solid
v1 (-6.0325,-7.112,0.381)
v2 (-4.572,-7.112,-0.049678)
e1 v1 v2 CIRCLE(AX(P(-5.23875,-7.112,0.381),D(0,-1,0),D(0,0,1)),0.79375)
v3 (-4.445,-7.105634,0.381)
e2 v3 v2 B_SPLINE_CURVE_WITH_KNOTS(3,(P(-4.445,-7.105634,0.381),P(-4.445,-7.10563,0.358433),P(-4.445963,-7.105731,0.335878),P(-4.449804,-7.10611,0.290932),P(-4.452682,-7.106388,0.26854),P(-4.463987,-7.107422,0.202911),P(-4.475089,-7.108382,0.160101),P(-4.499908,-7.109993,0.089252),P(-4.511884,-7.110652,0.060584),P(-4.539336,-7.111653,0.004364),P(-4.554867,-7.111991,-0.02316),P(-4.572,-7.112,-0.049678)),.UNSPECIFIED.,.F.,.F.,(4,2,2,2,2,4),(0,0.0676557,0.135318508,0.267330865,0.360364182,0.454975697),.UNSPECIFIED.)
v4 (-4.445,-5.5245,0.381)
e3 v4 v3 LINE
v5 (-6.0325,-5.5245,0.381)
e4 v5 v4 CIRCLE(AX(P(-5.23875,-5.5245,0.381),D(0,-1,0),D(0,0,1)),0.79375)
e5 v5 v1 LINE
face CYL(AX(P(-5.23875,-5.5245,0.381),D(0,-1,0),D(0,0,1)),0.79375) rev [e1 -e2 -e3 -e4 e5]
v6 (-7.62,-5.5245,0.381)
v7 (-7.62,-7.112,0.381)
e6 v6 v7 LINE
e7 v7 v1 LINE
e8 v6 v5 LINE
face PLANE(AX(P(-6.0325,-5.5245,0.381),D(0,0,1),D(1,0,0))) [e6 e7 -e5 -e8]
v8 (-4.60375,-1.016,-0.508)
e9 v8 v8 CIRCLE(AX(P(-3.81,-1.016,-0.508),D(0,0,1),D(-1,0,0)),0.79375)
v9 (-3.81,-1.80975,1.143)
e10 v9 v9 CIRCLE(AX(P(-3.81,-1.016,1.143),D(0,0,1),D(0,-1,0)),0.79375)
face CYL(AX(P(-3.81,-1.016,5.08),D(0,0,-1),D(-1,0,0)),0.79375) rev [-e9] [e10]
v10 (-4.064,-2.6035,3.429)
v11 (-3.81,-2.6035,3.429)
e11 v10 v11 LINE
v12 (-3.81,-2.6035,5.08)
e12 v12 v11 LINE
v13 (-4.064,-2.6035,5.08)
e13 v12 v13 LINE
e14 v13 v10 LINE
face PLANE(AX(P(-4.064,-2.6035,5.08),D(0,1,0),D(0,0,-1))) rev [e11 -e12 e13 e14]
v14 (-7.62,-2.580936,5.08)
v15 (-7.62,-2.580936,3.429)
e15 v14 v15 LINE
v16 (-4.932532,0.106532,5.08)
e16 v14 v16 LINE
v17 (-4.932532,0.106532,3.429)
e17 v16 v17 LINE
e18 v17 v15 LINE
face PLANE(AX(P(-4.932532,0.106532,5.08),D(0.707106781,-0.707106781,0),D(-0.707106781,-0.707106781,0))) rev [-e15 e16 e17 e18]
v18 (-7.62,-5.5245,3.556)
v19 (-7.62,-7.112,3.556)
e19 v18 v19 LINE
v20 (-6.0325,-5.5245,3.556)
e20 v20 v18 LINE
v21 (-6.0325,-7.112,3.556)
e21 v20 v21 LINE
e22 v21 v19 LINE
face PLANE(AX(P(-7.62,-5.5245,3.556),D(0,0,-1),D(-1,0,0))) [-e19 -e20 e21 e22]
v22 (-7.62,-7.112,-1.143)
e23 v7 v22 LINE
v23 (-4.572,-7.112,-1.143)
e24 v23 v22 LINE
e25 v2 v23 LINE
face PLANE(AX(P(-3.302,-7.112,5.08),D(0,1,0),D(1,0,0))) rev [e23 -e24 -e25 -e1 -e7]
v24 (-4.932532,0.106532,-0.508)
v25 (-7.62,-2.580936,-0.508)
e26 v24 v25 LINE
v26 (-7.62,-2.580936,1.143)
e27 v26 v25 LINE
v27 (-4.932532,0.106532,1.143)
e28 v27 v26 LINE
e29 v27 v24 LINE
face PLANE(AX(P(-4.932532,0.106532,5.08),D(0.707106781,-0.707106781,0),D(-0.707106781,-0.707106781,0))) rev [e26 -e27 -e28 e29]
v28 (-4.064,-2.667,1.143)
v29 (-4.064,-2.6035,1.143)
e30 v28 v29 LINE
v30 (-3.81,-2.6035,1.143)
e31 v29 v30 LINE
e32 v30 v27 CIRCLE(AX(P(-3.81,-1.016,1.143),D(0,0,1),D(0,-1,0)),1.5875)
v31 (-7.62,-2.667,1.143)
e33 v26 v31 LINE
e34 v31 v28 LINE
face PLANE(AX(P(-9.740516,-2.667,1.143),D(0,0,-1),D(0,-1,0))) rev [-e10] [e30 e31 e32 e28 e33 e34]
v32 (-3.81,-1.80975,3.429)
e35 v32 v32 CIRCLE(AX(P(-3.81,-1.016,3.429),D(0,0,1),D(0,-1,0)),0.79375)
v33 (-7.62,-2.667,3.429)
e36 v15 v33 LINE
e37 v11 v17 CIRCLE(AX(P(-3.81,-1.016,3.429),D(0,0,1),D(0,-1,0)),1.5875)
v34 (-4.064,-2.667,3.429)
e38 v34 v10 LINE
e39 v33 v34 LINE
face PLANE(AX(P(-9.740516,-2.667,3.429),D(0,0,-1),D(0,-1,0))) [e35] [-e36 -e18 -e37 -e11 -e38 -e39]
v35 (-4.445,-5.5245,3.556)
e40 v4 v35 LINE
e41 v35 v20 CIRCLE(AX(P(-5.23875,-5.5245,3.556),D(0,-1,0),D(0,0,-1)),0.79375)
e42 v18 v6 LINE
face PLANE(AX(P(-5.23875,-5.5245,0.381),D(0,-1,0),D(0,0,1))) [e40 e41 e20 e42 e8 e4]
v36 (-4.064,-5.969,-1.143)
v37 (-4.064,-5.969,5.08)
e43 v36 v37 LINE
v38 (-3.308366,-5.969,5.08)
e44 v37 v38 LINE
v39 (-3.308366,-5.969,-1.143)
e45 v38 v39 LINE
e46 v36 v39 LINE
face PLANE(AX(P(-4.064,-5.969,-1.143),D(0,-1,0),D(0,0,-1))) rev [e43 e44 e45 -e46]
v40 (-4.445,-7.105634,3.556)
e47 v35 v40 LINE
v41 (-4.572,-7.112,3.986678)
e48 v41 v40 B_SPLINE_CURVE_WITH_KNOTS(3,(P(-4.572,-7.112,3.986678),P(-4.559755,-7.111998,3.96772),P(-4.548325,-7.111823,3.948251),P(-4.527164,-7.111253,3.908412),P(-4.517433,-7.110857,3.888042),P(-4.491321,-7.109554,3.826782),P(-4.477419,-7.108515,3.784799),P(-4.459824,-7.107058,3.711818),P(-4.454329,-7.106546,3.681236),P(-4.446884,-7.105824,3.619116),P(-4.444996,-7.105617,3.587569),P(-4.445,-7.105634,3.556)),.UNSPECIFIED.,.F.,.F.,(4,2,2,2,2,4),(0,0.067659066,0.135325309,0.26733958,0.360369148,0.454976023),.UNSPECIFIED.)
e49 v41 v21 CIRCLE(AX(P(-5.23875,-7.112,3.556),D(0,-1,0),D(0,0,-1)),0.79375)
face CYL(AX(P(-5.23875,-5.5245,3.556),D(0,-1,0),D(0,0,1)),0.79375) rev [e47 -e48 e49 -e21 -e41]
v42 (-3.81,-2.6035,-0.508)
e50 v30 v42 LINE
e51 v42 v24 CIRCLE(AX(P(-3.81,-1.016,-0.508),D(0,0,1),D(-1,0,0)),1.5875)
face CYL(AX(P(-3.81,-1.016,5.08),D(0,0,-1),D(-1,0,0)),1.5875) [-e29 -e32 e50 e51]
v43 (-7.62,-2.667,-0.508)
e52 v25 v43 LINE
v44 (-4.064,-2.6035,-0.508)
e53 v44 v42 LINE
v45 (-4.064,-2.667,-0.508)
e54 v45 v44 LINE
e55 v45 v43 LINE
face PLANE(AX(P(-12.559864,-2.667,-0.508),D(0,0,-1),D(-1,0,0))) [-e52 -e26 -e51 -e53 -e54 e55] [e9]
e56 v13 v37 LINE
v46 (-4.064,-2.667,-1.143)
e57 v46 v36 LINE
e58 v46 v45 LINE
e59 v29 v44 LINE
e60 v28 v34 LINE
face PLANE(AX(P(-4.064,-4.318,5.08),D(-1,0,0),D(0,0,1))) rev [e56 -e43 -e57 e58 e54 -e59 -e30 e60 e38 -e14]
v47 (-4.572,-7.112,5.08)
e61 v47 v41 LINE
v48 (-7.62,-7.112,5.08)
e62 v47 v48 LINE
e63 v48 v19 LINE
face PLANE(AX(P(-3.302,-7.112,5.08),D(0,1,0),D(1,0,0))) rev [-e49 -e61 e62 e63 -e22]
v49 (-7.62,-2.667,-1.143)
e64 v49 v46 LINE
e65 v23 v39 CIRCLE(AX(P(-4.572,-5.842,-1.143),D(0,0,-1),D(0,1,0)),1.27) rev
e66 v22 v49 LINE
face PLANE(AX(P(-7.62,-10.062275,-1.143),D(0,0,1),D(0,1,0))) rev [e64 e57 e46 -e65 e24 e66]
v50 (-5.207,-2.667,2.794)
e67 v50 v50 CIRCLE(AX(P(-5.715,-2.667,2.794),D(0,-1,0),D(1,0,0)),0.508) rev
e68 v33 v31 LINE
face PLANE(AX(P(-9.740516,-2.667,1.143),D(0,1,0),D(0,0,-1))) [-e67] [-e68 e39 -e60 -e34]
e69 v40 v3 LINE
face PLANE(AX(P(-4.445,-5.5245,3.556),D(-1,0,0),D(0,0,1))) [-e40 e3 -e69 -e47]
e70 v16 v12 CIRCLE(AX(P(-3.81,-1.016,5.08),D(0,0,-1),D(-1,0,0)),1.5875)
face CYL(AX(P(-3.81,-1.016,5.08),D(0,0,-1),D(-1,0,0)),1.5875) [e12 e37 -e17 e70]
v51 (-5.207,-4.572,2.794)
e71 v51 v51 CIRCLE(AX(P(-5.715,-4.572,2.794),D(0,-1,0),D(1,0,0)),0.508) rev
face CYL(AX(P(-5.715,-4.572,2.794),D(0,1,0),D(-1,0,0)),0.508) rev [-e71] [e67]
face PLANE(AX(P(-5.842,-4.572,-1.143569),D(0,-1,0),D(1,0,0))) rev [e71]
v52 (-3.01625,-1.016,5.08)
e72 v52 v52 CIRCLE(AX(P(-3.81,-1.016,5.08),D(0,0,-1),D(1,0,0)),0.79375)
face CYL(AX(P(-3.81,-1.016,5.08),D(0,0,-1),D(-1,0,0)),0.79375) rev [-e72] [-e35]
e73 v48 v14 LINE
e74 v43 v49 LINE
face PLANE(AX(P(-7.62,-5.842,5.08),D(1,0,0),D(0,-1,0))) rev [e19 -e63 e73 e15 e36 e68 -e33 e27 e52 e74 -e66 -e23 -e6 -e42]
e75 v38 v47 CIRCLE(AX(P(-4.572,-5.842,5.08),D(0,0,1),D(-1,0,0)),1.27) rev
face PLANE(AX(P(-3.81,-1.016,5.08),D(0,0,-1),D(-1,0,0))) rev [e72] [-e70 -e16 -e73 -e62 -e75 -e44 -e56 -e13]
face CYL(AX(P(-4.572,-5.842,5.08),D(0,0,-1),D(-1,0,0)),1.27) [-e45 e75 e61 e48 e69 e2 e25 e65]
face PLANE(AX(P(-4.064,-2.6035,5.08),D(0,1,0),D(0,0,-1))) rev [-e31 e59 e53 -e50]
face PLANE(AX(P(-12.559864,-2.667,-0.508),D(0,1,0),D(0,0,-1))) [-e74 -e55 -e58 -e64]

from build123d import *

# Parameters (mm, degrees)
OUTER_START                           = -1.143
OUTER_CLAMP_LATCH_FILLET1_DEPTH       = 6.223
OUTER_START_2                         = 3.556
OUTER_CLAMP_LATCH_FILLET1_2_OUTLINE_R = 0.79375
OUTER_CLAMP_LATCH_FILLET1_2_DEPTH     = 1.524
OUTER_START_3                         = -0.508
OUTER_CLAMP_LATCH_FILLET1_3_OUTLINE_R = 0.79375
OUTER_CLAMP_LATCH_FILLET1_3_DEPTH     = 1.651
OUTER_CLAMP_LATCH_FILLET1_4_DEPTH     = 1.524
OUTER_START_4                         = 3.429
OUTER_CLAMP_LATCH_FILLET1_5_OUTLINE_R = 0.79375
OUTER_CLAMP_LATCH_FILLET1_5_DEPTH     = 0.127
OUTER_START_5                         = -7.112
OUTER_CLAMP_LATCH_FILLET1_6_DEPTH     = 1.5875
OUTER_START_6                         = -5.207
OUTER_CLAMP_LATCH_FILLET1_7_OUTLINE_R = 0.508
OUTER_CLAMP_LATCH_FILLET1_7_DEPTH     = 2.54
SKETCH1_W                             = 0.762
SKETCH1_H                             = 1.651
CUT_EXTRUDE1_DEPTH                    = 13.139632435
EXTRUDE1_START                        = -2.8575
SKETCH2_R                             = 0.508
EXTRUDE1_DEPTH                        = 2.8575
SKETCH2_3_R                           = 0.508
CUT_EXTRUDE2_DEPTH                    = 1.905


with BuildPart() as part:
    # <Outer Clamp Latch>-<Fillet1>: read off the stored shape, not the designer's step
    # <Outer Clamp Latch>-<Fillet1> outline → <Outer Clamp Latch>-<Fillet1> (new body)
    with BuildSketch(Plane.XY.offset(OUTER_START)):
        with BuildLine():
            Line((-4.445, -5.5245), (-4.445, -7.105634045))
            ThreePointArc((-4.445, -7.105634045), (-3.630142792, -6.693941899), (-3.302, -5.842))
            Line((-3.302, -5.842), (-3.302, -4.318))
            Line((-3.302, -4.318), (-4.064, -4.318))
            Line((-4.064, -4.318), (-4.064, -2.667))
            Line((-4.064, -2.667), (-7.62, -2.667))
            Line((-7.62, -2.667), (-7.62, -5.5245))
            Line((-7.62, -5.5245), (-4.445, -5.5245))
        make_face()
    extrude(amount=OUTER_CLAMP_LATCH_FILLET1_DEPTH)

    # Outer Clamp Latch_-_Fillet1 2 outline → Outer Clamp Latch_-_Fillet1 2 (add)
    # profile 1 of 2: a face of its own
    with BuildSketch(Plane.XY.offset(OUTER_START_2)):
        with BuildLine():
            Line((-7.62, -7.112), (-4.572, -7.112))
            ThreePointArc((-4.572, -7.112), (-4.508420276, -7.110407513), (-4.445, -7.105634045))
            Line((-4.445, -7.105634045), (-4.445, -5.5245))
            Line((-4.445, -5.5245), (-7.62, -5.5245))
            Line((-7.62, -5.5245), (-7.62, -7.112))
        make_face()
    # profile 2 of 2: a face of its own
    with BuildSketch(Plane.XY.offset(OUTER_START_2)):
        with BuildLine():
            Line((-7.62, -2.58093597), (-7.62, -2.667))
            Line((-7.62, -2.667), (-4.064, -2.667))
            Line((-4.064, -2.667), (-4.064, -2.6035))
            Line((-4.064, -2.6035), (-3.81, -2.6035))
            ThreePointArc((-3.81, -2.6035), (-2.343341242, -0.408490051), (-4.932532015, 0.106532015))
            Line((-4.932532015, 0.106532015), (-7.62, -2.58093597))
        make_face()
        with Locations((-3.81, -1.016)):
            Circle(OUTER_CLAMP_LATCH_FILLET1_2_OUTLINE_R, mode=Mode.SUBTRACT)
    extrude(amount=OUTER_CLAMP_LATCH_FILLET1_2_DEPTH)

    # Outer Clamp Latch_-_Fillet1 3 outline → Outer Clamp Latch_-_Fillet1 3 (add)
    with BuildSketch(Plane.XY.offset(OUTER_START_3)):
        with BuildLine():
            Line((-7.62, -2.58093597), (-7.62, -2.667))
            Line((-7.62, -2.667), (-4.064, -2.667))
            Line((-4.064, -2.667), (-4.064, -2.6035))
            Line((-4.064, -2.6035), (-3.81, -2.6035))
            ThreePointArc((-3.81, -2.6035), (-2.343341242, -0.408490051), (-4.932532015, 0.106532015))
            Line((-4.932532015, 0.106532015), (-7.62, -2.58093597))
        make_face()
        with Locations((-3.81, -1.016)):
            Circle(OUTER_CLAMP_LATCH_FILLET1_3_OUTLINE_R, mode=Mode.SUBTRACT)
    extrude(amount=OUTER_CLAMP_LATCH_FILLET1_3_DEPTH)

    # Outer Clamp Latch_-_Fillet1 4 outline → Outer Clamp Latch_-_Fillet1 4 (add)
    with BuildSketch(Plane.XY.offset(OUTER_START)):
        with BuildLine():
            Line((-7.62, -7.112), (-4.572, -7.112))
            ThreePointArc((-4.572, -7.112), (-4.508420276, -7.110407513), (-4.445, -7.105634045))
            Line((-4.445, -7.105634045), (-4.445, -5.5245))
            Line((-4.445, -5.5245), (-7.62, -5.5245))
            Line((-7.62, -5.5245), (-7.62, -7.112))
        make_face()
    extrude(amount=OUTER_CLAMP_LATCH_FILLET1_4_DEPTH)

    # Outer Clamp Latch_-_Fillet1 5 outline → Outer Clamp Latch_-_Fillet1 5 (add)
    with BuildSketch(Plane.XY.offset(OUTER_START_4)):
        with BuildLine():
            Line((-7.62, -2.58093597), (-7.62, -2.667))
            Line((-7.62, -2.667), (-4.064, -2.667))
            Line((-4.064, -2.667), (-4.064, -2.6035))
            Line((-4.064, -2.6035), (-3.81, -2.6035))
            ThreePointArc((-3.81, -2.6035), (-2.343341242, -0.408490051), (-4.932532015, 0.106532015))
            Line((-4.932532015, 0.106532015), (-7.62, -2.58093597))
        make_face()
        with Locations((-3.81, -1.016)):
            Circle(OUTER_CLAMP_LATCH_FILLET1_5_OUTLINE_R, mode=Mode.SUBTRACT)
    extrude(amount=OUTER_CLAMP_LATCH_FILLET1_5_DEPTH)

    # Outer Clamp Latch_-_Fillet1 6 outline → Outer Clamp Latch_-_Fillet1 6 (cut)
    with BuildSketch(Plane(origin=(0, 0, 0), x_dir=(1, 0, 0), z_dir=(0, 1, 0)).offset(OUTER_START_5)):
        with BuildLine():
            ThreePointArc((-4.445, -0.381), (-5.23875, 0.41275), (-6.0325, -0.381))
            Line((-6.0325, -0.381), (-4.445, -0.381))
        make_face()
        with BuildLine():
            ThreePointArc((-6.0325, -3.556), (-5.23875, -4.34975), (-4.445, -3.556))
            Line((-4.445, -3.556), (-6.0325, -3.556))
        make_face()
    extrude(amount=OUTER_CLAMP_LATCH_FILLET1_6_DEPTH, mode=Mode.SUBTRACT)

    # Outer Clamp Latch_-_Fillet1 7 outline → Outer Clamp Latch_-_Fillet1 7 (cut)
    with BuildSketch(Plane(origin=(0, 0, 0), x_dir=(1, 0, 0), z_dir=(0, 1, 0)).offset(OUTER_START_6)):
        with Locations((-5.715, -1.778)):
            Circle(OUTER_CLAMP_LATCH_FILLET1_7_OUTLINE_R)
    extrude(amount=OUTER_CLAMP_LATCH_FILLET1_7_DEPTH, mode=Mode.SUBTRACT)

    # Sketch1 → Cut-Extrude1 (cut, through all)
    with BuildSketch(Plane.XY.offset(5.08)):
        with Locations((-3.683, -5.1435)):
            Rectangle(SKETCH1_W, SKETCH1_H)
    extrude(amount=-CUT_EXTRUDE1_DEPTH, mode=Mode.SUBTRACT)

    # Sketch2 → Extrude1 (add)
    with BuildSketch(Plane(origin=(0, -2.667, 0), x_dir=(-1, 0, 0), z_dir=(0, 1, 0)).offset(EXTRUDE1_START)):
        with Locations((5.715, 2.794)):
            Circle(SKETCH2_R)
        with Locations((5.715, 1.778)):
            Circle(SKETCH2_R)
    extrude(amount=EXTRUDE1_DEPTH)

    # Sketch2<3> → Cut-Extrude2 (cut)
    with BuildSketch(Plane(origin=(0, -2.667, 0), x_dir=(-1, 0, 0), z_dir=(0, 1, 0))):
        with Locations(Location((5.715, 2.794, 0), (0, 0, 180))):
            Circle(SKETCH2_3_R)
    extrude(amount=-CUT_EXTRUDE2_DEPTH, mode=Mode.SUBTRACT)


solid = part.part
